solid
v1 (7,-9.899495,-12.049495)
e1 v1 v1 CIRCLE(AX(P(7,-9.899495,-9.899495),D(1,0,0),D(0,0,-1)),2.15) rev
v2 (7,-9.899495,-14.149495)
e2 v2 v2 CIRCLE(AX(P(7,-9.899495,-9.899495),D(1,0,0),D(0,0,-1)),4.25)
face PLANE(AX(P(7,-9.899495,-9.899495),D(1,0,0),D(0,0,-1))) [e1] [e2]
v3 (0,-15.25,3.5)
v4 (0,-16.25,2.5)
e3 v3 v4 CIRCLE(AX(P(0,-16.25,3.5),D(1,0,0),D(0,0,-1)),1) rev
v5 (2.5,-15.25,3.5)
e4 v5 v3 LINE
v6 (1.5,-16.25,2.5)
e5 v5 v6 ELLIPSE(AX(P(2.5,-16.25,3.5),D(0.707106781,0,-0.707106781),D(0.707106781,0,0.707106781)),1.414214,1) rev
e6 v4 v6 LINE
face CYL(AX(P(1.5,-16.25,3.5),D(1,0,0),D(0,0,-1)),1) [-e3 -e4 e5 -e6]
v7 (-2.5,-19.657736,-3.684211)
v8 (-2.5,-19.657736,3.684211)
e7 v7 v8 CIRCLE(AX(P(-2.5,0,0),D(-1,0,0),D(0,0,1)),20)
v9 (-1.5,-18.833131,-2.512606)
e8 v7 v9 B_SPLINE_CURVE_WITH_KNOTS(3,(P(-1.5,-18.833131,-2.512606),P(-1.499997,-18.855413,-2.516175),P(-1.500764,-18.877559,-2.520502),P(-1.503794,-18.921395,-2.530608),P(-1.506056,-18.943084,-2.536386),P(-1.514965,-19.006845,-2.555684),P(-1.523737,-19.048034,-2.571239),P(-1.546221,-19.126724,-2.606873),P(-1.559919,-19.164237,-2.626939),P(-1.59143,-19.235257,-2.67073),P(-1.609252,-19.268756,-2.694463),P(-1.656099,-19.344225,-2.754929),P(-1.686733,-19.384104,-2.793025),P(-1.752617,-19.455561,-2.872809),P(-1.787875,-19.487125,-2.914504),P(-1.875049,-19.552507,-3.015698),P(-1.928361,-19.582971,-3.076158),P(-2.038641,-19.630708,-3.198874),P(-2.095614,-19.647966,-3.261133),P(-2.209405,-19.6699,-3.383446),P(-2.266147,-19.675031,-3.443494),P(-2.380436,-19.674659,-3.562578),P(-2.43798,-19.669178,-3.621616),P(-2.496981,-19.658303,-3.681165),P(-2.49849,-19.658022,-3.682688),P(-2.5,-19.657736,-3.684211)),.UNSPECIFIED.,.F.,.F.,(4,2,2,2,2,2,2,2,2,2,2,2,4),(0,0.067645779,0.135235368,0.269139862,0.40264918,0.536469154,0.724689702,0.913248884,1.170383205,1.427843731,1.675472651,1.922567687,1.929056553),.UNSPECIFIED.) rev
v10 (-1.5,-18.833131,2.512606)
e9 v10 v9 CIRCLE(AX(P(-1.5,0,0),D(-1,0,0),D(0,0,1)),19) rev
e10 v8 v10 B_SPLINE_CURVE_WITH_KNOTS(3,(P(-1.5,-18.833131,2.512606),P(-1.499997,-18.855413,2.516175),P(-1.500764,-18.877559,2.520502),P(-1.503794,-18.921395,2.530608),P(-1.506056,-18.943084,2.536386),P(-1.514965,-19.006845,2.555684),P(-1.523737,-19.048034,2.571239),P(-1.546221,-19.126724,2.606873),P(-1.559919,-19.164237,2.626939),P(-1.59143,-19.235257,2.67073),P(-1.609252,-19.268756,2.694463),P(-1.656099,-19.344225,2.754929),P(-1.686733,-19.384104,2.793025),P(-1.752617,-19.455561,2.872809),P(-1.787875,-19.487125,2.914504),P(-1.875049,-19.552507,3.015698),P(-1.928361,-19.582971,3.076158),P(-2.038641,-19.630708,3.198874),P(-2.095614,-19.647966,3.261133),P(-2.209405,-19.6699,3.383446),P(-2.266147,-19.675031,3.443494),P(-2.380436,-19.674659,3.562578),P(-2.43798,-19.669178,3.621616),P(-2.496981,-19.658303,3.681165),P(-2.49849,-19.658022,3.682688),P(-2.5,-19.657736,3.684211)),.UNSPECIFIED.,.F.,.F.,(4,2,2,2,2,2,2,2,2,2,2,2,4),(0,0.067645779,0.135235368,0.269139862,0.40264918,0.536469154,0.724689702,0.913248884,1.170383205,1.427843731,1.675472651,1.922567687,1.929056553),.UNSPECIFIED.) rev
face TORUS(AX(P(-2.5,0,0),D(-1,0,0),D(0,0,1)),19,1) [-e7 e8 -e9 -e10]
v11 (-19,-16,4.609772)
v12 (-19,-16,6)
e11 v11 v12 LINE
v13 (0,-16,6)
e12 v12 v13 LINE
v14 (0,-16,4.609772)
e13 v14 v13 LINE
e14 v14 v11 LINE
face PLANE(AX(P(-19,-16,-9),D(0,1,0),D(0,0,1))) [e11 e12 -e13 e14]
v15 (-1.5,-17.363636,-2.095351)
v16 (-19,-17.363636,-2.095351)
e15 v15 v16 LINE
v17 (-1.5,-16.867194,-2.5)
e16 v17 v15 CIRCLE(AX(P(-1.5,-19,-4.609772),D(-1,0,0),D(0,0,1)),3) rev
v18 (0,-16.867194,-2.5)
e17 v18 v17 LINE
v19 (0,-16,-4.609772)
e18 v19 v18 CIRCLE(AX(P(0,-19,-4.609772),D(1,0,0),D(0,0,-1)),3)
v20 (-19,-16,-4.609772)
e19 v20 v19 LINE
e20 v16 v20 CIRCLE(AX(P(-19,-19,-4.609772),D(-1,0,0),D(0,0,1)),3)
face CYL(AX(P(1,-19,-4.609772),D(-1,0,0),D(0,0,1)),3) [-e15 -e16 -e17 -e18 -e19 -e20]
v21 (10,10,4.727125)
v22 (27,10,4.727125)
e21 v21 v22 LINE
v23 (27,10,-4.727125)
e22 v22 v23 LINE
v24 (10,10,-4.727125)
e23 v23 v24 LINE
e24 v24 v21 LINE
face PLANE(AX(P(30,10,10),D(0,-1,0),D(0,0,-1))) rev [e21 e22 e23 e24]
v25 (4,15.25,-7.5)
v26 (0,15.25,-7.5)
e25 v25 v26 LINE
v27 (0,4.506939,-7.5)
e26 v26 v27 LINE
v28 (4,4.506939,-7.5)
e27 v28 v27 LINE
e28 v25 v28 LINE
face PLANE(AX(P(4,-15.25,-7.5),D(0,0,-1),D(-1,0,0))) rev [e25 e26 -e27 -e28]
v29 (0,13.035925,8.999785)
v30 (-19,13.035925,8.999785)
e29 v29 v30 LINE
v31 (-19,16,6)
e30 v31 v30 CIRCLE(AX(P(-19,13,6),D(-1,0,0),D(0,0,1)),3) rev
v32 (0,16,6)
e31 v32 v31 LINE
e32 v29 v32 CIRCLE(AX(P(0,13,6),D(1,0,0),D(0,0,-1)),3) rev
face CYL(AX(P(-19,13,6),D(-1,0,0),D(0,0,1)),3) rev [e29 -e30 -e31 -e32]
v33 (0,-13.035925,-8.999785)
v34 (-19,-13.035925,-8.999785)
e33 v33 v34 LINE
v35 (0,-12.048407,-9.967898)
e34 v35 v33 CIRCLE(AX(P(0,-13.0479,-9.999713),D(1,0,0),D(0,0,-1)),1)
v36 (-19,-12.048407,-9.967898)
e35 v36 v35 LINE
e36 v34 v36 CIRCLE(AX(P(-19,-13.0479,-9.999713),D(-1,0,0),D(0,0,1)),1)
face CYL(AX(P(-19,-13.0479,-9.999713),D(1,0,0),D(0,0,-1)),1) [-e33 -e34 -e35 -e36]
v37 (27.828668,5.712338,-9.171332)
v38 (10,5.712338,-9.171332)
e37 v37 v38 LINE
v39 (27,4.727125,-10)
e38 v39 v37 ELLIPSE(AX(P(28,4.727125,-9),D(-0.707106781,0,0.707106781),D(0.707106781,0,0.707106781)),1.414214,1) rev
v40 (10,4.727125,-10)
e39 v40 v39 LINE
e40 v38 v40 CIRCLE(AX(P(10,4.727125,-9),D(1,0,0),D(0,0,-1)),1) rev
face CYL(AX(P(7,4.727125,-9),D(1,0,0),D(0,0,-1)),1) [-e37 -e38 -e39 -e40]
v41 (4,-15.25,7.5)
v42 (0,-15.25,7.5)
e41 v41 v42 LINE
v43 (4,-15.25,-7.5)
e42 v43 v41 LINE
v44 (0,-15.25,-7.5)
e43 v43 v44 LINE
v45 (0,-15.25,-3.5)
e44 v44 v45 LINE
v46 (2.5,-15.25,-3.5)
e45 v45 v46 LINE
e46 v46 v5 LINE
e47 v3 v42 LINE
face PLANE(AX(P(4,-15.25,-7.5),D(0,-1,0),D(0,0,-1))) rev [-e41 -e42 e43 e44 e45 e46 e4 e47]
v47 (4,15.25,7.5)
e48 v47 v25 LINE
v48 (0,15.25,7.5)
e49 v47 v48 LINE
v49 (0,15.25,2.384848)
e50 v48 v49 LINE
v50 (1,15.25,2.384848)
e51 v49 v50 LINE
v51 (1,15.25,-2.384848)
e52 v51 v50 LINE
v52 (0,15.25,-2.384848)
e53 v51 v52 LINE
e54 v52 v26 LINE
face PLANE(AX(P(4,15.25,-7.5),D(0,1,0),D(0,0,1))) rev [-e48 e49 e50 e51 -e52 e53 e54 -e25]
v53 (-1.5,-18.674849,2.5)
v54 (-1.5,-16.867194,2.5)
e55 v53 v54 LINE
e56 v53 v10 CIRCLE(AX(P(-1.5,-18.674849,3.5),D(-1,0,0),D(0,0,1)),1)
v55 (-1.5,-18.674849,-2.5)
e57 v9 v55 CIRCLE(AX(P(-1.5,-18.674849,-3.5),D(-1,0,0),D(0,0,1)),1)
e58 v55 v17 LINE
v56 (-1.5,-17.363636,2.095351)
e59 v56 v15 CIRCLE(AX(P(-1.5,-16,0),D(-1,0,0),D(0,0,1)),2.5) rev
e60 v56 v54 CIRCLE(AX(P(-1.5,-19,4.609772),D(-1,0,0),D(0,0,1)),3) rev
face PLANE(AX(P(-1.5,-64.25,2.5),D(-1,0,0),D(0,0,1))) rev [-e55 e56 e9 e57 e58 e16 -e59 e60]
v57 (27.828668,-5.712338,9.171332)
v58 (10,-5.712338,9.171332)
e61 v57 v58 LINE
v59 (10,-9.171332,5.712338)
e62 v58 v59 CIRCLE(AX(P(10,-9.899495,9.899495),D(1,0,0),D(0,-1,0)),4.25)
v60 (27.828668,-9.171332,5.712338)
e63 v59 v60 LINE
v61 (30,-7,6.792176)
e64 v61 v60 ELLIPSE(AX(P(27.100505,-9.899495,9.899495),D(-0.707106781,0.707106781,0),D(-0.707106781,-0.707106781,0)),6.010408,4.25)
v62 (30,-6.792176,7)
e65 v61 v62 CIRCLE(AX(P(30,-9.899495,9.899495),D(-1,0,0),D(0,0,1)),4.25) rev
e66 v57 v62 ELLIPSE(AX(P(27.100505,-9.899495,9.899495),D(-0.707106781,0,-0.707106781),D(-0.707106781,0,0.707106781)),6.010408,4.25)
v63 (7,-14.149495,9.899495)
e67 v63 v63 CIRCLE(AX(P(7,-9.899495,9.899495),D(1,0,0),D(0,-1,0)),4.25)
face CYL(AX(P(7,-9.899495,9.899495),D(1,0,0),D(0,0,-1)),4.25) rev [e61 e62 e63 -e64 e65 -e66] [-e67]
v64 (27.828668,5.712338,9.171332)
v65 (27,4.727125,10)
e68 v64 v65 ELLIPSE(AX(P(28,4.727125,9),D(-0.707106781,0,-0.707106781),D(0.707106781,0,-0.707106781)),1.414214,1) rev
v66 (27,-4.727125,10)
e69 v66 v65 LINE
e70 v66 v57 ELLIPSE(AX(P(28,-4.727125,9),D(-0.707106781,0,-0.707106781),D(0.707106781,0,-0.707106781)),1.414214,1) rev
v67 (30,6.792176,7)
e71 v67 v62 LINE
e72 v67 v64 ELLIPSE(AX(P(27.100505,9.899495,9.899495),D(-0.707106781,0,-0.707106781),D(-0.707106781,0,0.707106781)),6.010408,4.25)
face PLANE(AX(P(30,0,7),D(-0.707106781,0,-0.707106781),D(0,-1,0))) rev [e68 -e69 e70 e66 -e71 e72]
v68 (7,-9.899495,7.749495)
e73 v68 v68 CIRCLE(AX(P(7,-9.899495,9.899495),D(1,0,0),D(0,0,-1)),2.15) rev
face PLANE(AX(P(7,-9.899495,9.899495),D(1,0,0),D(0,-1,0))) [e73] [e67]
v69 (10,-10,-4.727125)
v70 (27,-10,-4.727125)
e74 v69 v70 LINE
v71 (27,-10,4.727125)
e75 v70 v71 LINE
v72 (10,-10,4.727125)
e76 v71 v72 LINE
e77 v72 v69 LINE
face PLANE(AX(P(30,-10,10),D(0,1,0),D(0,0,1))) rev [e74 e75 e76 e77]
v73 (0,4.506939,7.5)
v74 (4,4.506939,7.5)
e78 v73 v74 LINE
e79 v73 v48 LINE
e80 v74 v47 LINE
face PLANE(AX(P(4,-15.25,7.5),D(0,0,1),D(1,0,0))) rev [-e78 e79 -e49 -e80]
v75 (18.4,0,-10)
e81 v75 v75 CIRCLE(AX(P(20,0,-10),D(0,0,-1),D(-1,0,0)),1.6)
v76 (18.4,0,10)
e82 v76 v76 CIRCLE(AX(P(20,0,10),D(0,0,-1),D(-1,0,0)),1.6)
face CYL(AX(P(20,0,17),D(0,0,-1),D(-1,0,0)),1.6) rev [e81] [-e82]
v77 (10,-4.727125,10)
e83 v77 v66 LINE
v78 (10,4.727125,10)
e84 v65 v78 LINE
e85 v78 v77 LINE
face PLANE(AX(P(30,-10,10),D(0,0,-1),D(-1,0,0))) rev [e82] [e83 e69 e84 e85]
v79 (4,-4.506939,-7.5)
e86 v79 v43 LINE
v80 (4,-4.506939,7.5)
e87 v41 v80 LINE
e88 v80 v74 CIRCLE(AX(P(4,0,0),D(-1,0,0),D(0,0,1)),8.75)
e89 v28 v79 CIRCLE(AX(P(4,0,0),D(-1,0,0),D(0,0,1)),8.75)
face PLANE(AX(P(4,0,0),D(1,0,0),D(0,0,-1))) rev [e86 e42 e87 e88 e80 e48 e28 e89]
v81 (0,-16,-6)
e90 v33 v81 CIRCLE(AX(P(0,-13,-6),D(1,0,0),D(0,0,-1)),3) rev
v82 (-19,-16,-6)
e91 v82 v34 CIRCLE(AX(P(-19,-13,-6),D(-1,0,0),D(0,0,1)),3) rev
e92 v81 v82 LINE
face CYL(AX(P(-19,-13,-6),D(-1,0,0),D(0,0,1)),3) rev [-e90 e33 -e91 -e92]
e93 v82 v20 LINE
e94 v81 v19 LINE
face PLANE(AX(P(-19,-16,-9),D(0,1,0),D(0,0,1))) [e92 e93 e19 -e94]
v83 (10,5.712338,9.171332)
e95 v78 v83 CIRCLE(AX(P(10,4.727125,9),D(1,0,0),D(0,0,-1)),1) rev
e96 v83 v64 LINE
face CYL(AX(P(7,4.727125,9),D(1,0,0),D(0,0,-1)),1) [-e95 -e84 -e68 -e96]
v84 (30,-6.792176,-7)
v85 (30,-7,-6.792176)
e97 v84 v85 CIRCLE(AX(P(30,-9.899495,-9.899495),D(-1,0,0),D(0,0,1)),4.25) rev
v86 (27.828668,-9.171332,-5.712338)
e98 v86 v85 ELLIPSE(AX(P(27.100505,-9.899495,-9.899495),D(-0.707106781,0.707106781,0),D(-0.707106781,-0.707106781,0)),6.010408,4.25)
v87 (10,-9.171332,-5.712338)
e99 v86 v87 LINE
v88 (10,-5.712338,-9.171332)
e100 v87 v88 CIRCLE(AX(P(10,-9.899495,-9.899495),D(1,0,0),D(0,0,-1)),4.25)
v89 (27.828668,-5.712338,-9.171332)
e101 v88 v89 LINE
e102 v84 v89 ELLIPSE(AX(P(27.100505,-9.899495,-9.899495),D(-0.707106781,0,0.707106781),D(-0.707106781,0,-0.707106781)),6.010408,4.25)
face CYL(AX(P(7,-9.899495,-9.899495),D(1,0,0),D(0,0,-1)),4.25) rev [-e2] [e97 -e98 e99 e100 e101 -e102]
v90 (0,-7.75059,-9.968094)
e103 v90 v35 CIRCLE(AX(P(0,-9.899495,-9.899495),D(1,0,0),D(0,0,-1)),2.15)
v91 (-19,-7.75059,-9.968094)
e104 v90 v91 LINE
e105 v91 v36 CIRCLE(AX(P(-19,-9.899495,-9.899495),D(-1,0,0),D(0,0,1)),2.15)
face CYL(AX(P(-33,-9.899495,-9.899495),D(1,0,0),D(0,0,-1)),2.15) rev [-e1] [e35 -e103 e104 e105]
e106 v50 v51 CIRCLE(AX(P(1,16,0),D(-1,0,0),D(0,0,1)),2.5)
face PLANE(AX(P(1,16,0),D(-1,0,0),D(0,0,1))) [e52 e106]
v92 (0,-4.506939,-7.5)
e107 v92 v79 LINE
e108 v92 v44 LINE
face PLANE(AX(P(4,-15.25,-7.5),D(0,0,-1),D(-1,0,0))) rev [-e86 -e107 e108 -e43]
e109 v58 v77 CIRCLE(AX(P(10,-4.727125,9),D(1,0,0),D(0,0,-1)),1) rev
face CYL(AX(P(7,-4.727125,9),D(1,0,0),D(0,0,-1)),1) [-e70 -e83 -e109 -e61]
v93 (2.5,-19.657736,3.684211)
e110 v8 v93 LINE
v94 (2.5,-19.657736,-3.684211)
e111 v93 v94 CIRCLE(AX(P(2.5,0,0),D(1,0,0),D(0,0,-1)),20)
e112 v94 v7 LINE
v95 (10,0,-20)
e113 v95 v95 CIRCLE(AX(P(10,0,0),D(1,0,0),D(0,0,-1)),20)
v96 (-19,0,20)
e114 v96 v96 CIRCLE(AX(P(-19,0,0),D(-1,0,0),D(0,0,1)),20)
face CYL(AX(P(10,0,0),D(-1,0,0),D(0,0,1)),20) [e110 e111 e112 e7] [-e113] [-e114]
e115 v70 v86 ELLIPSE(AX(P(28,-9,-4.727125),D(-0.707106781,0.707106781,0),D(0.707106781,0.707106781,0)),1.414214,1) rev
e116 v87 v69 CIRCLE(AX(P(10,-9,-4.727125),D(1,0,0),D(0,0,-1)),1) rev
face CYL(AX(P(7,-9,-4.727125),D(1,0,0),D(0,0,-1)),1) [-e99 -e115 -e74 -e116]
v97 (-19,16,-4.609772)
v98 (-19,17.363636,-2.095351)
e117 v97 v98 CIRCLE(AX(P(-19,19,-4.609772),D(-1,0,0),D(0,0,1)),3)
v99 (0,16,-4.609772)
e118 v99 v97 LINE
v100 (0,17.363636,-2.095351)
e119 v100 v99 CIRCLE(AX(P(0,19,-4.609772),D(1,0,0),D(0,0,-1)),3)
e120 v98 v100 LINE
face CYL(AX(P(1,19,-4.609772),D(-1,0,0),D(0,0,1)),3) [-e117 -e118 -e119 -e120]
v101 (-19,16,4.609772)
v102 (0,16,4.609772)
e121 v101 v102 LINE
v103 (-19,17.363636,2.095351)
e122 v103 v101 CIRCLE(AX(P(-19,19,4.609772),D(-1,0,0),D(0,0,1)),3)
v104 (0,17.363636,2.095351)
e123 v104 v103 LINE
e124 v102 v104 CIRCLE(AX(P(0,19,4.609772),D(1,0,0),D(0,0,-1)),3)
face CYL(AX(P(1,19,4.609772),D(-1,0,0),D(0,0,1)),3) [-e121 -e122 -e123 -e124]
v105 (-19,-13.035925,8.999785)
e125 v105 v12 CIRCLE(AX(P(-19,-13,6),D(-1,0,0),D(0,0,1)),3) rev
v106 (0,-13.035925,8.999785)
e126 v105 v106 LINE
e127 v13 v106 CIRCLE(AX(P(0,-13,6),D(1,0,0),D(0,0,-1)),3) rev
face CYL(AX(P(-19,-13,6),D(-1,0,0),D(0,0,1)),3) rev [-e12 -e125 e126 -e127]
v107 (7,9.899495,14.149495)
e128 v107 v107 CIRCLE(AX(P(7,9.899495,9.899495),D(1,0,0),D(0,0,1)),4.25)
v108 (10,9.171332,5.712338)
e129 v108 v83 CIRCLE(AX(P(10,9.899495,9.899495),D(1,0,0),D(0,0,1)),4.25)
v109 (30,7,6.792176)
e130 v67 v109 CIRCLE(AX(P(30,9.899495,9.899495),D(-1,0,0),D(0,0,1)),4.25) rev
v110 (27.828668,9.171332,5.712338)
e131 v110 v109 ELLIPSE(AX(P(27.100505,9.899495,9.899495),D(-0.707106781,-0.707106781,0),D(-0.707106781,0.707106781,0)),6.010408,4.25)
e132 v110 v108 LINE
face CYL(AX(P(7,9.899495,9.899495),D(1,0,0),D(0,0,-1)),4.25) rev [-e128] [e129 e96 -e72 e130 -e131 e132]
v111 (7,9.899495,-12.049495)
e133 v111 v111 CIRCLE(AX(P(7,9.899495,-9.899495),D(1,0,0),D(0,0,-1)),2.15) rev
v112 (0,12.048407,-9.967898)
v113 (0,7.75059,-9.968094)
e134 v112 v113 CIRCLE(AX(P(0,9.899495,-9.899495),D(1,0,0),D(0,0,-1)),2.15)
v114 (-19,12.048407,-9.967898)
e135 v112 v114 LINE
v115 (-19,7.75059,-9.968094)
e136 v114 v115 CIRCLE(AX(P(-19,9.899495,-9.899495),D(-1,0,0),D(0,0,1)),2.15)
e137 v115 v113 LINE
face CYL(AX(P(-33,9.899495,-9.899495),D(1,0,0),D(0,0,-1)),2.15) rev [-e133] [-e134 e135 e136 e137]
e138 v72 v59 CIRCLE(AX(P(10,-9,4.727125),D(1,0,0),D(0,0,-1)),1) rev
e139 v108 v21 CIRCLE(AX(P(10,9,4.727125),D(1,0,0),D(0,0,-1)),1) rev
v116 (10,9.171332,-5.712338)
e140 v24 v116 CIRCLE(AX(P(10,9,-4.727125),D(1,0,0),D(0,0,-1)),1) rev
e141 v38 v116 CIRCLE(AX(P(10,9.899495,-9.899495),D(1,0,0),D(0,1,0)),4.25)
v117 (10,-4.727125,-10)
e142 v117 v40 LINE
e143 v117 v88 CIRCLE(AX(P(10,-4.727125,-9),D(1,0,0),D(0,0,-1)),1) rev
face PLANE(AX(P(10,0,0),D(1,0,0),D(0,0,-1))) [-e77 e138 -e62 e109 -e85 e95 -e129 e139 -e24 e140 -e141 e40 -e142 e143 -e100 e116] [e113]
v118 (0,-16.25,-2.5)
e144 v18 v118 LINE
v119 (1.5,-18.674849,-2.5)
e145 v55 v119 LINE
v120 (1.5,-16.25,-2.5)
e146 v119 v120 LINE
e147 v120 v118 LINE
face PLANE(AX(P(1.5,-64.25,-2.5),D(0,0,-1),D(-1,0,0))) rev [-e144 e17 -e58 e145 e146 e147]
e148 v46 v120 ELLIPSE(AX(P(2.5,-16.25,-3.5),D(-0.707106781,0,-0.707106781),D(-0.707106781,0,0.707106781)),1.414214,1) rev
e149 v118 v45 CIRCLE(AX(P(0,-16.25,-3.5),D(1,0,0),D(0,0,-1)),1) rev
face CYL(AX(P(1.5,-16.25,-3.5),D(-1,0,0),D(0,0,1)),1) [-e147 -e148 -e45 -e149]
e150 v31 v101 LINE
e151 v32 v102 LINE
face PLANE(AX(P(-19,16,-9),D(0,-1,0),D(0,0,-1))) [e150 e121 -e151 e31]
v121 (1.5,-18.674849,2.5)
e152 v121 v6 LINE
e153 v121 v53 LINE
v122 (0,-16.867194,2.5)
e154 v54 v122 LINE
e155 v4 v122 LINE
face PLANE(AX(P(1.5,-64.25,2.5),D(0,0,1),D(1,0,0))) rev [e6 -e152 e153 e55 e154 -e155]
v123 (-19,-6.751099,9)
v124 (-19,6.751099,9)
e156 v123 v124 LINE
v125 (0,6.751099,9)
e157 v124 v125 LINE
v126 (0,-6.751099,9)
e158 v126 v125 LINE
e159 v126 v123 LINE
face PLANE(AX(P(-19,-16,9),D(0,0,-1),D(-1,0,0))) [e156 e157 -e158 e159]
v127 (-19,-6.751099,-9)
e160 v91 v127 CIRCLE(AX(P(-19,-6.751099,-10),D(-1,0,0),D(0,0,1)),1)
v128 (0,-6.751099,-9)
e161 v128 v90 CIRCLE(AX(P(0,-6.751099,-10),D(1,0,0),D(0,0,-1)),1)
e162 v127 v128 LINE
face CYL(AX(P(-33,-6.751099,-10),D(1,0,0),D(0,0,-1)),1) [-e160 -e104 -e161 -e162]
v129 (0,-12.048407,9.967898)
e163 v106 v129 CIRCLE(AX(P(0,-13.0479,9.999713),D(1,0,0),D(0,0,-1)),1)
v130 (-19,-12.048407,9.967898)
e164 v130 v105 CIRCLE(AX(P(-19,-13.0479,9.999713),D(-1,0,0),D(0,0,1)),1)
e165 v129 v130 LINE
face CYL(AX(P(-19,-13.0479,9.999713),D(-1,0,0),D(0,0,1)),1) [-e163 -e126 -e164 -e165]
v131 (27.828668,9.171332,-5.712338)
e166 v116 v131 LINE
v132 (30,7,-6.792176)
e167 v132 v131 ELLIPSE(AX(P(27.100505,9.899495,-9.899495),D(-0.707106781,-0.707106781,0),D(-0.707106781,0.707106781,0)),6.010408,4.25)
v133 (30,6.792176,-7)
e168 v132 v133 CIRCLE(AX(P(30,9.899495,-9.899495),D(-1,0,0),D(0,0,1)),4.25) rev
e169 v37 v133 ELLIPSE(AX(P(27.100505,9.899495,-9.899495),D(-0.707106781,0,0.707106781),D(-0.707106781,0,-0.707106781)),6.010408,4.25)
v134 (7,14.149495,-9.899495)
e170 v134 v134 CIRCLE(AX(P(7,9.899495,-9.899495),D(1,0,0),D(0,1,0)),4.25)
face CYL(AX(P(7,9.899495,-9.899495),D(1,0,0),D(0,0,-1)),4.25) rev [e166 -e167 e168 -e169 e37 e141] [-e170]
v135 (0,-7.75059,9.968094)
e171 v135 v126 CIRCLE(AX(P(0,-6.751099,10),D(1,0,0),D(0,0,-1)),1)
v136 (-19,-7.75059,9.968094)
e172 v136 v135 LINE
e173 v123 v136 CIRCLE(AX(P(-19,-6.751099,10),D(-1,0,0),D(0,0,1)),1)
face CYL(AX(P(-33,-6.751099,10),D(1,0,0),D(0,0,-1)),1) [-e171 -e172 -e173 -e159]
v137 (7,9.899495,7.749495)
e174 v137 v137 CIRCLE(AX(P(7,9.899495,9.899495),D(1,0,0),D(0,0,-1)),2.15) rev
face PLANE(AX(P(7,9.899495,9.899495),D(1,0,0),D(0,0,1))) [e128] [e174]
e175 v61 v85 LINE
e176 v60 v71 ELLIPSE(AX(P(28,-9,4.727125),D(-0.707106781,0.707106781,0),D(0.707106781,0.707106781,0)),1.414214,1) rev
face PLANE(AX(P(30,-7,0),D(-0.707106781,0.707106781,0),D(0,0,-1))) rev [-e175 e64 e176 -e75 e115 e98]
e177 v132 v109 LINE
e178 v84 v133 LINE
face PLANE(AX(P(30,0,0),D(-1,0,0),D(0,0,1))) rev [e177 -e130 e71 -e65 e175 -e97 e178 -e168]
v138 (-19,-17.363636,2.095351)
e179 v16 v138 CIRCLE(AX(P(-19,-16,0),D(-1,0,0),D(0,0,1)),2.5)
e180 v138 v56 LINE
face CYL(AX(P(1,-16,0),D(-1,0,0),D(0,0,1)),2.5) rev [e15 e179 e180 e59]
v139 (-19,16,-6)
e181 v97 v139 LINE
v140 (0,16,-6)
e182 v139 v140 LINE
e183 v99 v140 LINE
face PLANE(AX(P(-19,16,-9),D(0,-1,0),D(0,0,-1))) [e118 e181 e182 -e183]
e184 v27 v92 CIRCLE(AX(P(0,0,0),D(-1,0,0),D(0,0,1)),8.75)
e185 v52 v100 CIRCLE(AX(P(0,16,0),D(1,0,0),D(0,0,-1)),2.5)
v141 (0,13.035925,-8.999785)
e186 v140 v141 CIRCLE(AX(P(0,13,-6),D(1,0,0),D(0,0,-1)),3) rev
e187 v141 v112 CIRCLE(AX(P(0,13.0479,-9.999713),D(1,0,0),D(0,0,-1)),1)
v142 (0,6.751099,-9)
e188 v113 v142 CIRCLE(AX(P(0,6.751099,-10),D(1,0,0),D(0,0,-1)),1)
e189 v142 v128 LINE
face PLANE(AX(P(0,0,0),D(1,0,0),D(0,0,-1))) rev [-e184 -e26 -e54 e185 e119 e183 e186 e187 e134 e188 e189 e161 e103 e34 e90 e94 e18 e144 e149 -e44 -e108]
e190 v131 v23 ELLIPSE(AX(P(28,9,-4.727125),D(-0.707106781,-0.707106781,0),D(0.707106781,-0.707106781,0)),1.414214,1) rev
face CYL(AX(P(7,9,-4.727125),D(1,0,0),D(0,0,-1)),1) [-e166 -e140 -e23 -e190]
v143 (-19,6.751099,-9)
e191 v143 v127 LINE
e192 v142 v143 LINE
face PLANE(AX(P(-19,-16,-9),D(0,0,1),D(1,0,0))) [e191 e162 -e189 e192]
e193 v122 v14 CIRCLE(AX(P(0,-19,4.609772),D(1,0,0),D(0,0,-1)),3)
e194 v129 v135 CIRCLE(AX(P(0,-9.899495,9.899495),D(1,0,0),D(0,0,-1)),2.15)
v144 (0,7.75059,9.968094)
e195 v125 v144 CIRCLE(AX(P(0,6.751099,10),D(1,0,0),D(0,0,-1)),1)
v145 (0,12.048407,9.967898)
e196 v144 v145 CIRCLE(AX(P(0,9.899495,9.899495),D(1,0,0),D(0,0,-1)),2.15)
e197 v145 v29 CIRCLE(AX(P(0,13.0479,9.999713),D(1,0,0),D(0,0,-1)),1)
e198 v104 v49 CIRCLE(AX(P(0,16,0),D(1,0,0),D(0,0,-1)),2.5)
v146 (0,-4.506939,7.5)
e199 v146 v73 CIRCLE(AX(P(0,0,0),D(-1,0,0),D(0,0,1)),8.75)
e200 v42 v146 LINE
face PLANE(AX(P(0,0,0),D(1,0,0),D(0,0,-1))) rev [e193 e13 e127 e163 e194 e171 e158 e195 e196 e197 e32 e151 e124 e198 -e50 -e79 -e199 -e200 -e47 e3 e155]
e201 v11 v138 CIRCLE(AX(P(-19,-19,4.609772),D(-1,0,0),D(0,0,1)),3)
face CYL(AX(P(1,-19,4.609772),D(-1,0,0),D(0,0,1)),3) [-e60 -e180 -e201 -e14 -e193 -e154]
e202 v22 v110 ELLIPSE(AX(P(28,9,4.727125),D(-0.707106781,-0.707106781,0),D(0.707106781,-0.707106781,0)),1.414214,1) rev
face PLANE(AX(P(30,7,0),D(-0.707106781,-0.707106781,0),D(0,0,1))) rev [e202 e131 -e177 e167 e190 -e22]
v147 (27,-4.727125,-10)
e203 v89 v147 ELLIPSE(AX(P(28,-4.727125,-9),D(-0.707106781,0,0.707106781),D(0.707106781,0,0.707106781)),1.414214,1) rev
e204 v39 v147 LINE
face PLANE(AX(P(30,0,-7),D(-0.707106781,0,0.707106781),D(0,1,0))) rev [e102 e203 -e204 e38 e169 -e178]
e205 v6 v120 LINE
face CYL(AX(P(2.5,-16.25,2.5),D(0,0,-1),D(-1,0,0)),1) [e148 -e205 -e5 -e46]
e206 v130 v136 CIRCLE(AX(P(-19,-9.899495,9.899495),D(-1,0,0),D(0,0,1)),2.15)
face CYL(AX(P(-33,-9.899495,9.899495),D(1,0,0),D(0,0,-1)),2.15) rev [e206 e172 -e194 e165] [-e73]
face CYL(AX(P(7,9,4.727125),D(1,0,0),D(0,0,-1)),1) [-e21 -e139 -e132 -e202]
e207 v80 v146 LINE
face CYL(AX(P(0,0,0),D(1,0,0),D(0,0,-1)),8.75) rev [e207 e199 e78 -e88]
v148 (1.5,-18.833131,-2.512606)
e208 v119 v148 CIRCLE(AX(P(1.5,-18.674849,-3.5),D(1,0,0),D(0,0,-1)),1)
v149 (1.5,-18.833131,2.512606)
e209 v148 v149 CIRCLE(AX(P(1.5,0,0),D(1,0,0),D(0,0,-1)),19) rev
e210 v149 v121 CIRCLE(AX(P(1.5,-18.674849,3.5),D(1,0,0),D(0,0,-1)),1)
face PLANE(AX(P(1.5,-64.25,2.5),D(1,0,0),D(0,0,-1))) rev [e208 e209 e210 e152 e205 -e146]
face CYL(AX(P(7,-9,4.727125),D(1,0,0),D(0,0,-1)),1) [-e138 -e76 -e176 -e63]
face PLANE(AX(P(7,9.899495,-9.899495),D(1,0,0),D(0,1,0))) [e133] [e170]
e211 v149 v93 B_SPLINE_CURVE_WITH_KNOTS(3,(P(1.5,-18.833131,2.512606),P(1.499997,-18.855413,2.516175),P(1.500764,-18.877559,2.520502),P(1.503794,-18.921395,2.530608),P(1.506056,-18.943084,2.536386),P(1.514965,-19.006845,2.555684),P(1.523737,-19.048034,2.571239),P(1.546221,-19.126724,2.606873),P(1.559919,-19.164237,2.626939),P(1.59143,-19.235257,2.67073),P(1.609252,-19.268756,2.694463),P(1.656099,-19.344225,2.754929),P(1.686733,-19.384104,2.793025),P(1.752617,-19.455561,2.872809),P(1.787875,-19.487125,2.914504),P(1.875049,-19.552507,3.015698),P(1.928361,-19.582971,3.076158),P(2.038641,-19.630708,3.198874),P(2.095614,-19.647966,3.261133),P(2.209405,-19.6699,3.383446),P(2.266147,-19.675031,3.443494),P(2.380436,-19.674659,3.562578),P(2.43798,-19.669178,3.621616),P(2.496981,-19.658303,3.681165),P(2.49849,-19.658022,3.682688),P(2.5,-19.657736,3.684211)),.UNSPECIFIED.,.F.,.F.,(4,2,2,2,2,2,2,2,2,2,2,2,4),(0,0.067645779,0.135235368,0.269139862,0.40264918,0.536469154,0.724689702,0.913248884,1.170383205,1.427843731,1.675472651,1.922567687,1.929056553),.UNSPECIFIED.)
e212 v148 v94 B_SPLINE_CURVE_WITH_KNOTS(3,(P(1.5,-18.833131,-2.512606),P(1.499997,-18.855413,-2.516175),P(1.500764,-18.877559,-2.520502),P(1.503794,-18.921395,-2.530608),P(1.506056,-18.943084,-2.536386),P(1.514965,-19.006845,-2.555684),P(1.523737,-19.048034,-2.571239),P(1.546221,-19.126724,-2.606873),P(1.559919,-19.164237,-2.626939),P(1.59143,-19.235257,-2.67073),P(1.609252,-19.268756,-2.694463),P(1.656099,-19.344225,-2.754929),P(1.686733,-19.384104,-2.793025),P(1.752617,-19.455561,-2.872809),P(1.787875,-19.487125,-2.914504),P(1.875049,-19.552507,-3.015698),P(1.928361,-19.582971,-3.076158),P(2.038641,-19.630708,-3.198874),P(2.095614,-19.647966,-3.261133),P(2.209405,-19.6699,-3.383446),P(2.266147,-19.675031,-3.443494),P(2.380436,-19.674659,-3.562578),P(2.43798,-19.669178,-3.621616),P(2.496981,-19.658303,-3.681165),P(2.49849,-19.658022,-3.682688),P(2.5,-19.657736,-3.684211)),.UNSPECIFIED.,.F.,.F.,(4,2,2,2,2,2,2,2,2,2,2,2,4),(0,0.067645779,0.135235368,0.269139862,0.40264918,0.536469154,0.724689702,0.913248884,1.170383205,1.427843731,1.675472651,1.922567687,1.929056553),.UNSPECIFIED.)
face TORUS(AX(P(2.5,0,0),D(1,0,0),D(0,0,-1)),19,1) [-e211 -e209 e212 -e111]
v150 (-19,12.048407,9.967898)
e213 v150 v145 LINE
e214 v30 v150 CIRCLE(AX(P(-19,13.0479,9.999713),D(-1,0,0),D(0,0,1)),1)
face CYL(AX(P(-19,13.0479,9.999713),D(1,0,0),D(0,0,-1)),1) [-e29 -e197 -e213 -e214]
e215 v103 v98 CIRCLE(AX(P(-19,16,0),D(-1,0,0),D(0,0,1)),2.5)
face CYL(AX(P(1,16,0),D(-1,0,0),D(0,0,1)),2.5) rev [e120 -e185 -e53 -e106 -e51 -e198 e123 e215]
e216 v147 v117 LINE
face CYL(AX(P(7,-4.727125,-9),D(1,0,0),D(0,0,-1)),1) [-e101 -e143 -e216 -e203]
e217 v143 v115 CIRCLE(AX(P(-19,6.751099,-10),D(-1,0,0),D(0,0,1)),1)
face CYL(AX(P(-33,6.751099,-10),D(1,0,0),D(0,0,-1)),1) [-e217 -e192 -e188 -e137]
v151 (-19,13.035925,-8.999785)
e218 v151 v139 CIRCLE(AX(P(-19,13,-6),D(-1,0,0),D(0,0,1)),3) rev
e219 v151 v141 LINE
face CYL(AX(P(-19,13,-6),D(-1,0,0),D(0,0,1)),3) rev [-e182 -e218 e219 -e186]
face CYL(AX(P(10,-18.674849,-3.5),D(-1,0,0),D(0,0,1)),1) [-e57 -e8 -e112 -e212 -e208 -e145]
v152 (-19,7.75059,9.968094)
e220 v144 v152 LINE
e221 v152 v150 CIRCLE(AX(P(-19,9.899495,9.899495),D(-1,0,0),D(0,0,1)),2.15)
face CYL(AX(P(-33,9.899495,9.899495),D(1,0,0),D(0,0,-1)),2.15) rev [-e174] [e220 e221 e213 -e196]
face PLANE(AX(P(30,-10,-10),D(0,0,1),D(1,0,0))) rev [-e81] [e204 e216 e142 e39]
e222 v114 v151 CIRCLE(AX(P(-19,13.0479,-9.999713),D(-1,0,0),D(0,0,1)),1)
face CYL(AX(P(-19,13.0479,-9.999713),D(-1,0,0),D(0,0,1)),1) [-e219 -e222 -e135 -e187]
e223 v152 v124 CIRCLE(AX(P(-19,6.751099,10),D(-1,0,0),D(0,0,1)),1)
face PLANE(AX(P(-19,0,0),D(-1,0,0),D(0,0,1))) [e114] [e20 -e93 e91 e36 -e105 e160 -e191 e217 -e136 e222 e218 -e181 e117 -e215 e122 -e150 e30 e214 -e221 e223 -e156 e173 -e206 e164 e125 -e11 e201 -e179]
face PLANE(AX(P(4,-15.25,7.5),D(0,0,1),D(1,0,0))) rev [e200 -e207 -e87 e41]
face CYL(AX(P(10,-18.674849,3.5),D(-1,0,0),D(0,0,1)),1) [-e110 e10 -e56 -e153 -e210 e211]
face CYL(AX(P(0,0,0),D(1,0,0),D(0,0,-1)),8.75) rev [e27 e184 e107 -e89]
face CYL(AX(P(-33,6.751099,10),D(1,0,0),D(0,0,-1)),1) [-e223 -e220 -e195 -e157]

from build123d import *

# Parameters (mm, degrees)
SKETCH_1_R               = 20
EXTRUDE_1_DEPTH          = 10
SKETCH_2_W               = 15
SKETCH_2_H               = 30.5
CUT_EXTRUDE_1_DEPTH      = 4
SKETCH_3_R               = 8.75
CUT_EXTRUDE_2_DEPTH      = 4
EXTRUDE_START            = 19
SKETCH_4_R               = 20
SKETCH_4_W               = 18
SKETCH_4_H               = 32
EXTRUDE_2_DEPTH          = 19
FILLET_1_R               = 3
SKETCH_5_R               = 2.5
CUT_EXTRUDE_3_DEPTH      = 20
FILLET_2_R               = 3
SKETCH_6_R               = 2.15
CUT_EXTRUDE_4_DEPTH      = 43
FILLET_3_R               = 1
SKETCH_7_R               = 4.25
CUT_EXTRUDE_5_DEPTH      = 3
PATTERN_CIRCULAR_1_COUNT = 4
SKETCH_8_W               = 20
SKETCH_8_H               = 20
EXTRUDE_3_DEPTH          = 20
SKETCH_9_R               = 1.6
CUT_EXTRUDE_6_DEPTH      = 27
CHAMFER_1_SIZE           = 3
CUT_EXTRUDE_START        = 49
SKETCH_11_R              = 4.25
CUT_EXTRUDE_7_DEPTH      = 49
SKETCH_12_W              = 3
SKETCH_12_H              = 5
CUT_EXTRUDE_8_DEPTH      = 49
FILLET_4_R               = 1
FILLET_5_R               = 1
FILLET_6_R               = 1
FILLET_7_R               = 1


with BuildPart() as part:
    # 草图1 → 凸台-拉伸1 (new body)
    with BuildSketch(Plane(origin=(0, 0, 0), x_dir=(0, 0, -1), z_dir=(1, 0, 0))):
        Circle(SKETCH_1_R)
    extrude(amount=EXTRUDE_1_DEPTH)

    # 草图2 → 切除-拉伸1 (cut)
    with BuildSketch(Plane.ZY):
        Rectangle(SKETCH_2_W, SKETCH_2_H)
    extrude(amount=-CUT_EXTRUDE_1_DEPTH, mode=Mode.SUBTRACT)

    # 草图3 → 切除-拉伸2 (cut)
    with BuildSketch(Plane.ZY.offset(-4)):
        Circle(SKETCH_3_R)
    extrude(amount=CUT_EXTRUDE_2_DEPTH, mode=Mode.SUBTRACT)

    # 草图4 → 凸台-拉伸2 (add)
    with BuildSketch(Plane.ZY.offset(EXTRUDE_START)):
        Circle(SKETCH_4_R)
        Rectangle(SKETCH_4_W, SKETCH_4_H, mode=Mode.SUBTRACT)
    extrude(amount=-EXTRUDE_2_DEPTH)

    # 圆角1
    fillet_1_edges = [part.edges().sort_by_distance(p)[0] for p in [
        (-9.5, 16, 9),
        (-9.5, 16, -9),
        (-9.5, -16, -9),
        (-9.5, -16, 9),
    ]]
    fillet(fillet_1_edges, radius=FILLET_1_R)

    # 草图5 → 切除-拉伸3 (cut)
    with BuildSketch(Plane.ZY.offset(19)):
        with Locations((0, -16)):
            Circle(SKETCH_5_R)
        with Locations((0, 16)):
            Circle(SKETCH_5_R)
    extrude(amount=-CUT_EXTRUDE_3_DEPTH, mode=Mode.SUBTRACT)

    # 圆角2
    # the kernel refuses this fillet: 3 mm, written as the material it takes off along each edge
    with BuildSketch(Plane(origin=(-24.274430572, -16, 2.5), x_dir=(0, -0.9586814917396833, -0.2844816292764363), z_dir=(1, 0, 0))) as fillet_2_piece_1:
        with BuildLine():
            CenterArc((2.275853034, -2.876044475), FILLET_2_R, 106.527865575, 56.944268849)
            Line((-0.600191441, -2.022599587), (0, 0))
            ThreePointArc((0, 0), (0.711204073, -0.103296271), (1.422408146, 0))
        make_face()
    extrude(amount=24.274430572, mode=Mode.SUBTRACT)
    with BuildSketch(Plane(origin=(0, -16, -2.5), x_dir=(0, 0, -1), z_dir=(-1, 0, 0))) as fillet_2_piece_2:
        with BuildLine():
            CenterArc((2.109772229, 3), FILLET_2_R, 213.055731151, 56.944268849)
            ThreePointArc((-0.404648987, 1.363636364), (-0.103296271, 0.711204073), (0, 0))
            Line((0, 0), (2.109772229, 0))
        make_face()
    extrude(amount=24.274430572, mode=Mode.SUBTRACT)
    with BuildSketch(Plane(origin=(0, 16, -2.5), x_dir=(0, 0.9586814917396834, 0.2844816292764354), z_dir=(-1, 0, 0))) as fillet_2_piece_3:
        with BuildLine():
            CenterArc((2.275853034, 2.876044475), FILLET_2_R, 196.527865575, 56.944268849)
            Line((-0.600191441, 2.022599587), (0, 0))
            ThreePointArc((0, 0), (0.711204073, 0.103296271), (1.422408146, 0))
        make_face()
    extrude(amount=24.274430572, mode=Mode.SUBTRACT)
    with BuildSketch(Plane(origin=(-24.274430572, 16, 2.5), x_dir=(0, 0, 1), z_dir=(1, 0, 0))) as fillet_2_piece_4:
        with BuildLine():
            CenterArc((2.109772229, -3), FILLET_2_R, 90, 56.944268849)
            ThreePointArc((-0.404648987, -1.363636364), (-0.103296271, -0.711204073), (0, 0))
            Line((0, 0), (2.109772229, 0))
        make_face()
    extrude(amount=24.274430572, mode=Mode.SUBTRACT)

    # 草图6 → 切除-拉伸4 (cut)
    with BuildSketch(Plane(origin=(10, 0, 0), x_dir=(0, 0, -1), z_dir=(1, 0, 0))):
        with Locations((9.899494937, -9.899494937)):
            Circle(SKETCH_6_R)
        with Locations((-9.899494937, -9.899494937)):
            Circle(SKETCH_6_R)
        with Locations((-9.899494937, 9.899494937)):
            Circle(SKETCH_6_R)
        with Locations((9.899494937, 9.899494937)):
            Circle(SKETCH_6_R)
    extrude(amount=-CUT_EXTRUDE_4_DEPTH, mode=Mode.SUBTRACT)

    # 圆角3
    # the kernel refuses this fillet: 1 mm, written as the material it takes off along each edge
    with BuildSketch(Plane(origin=(-21.98900269, -7.946699797, 9), x_dir=(0, 0.1985408891964352, 0.9800926054802622), z_dir=(1, 0, 0)), Plane(origin=(-21.98900269, 7.946699797, -9), x_dir=(0, -0.19854088919647347, -0.9800926054802545), z_dir=(1, 0, 0))) as fillet_3_piece_1:
        with BuildLine():
            CenterArc((1.217468306, -0.973258884), FILLET_3_R, 103.280057781, 88.171589383)
            Line((0.237375701, -1.171799774), (0, 0))
            ThreePointArc((0, 0), (0.493878653, -0.057493399), (0.987757305, 0))
        make_face()
    extrude(amount=21.98900269, mode=Mode.SUBTRACT)
    with BuildSketch(Plane(origin=(-21.959087911, -11.852290077, 9), x_dir=(0, -0.999999983485678, -0.00018173784322620402), z_dir=(1, 0, 0)), Plane(origin=(-21.959087911, 11.852290077, -9), x_dir=(0, 0.9999999834856781, 0.00018173784322619477), z_dir=(1, 0, 0))) as fillet_3_piece_2:
        with BuildLine():
            CenterArc((1.195428513, -0.999930456), FILLET_3_R, 90.675724778, 87.490671362)
            Line((0.195940547, -0.967933494), (0.09599175, -0.964733798))
            ThreePointArc((0.09599175, -0.964733798), (0.056286672, -0.492404834), (-0.090835283, -0.041820466))
            Line((-0.090835283, -0.041820466), (1.8174e-05, 0.099999998))
            ThreePointArc((1.8174e-05, 0.099999998), (1.147728078, 0.099791416), (1.182455829, 0.099993046))
            Line((1.182455829, 0.099993046), (1.183635164, 0))
        make_face()
    extrude(amount=21.959087911, mode=Mode.SUBTRACT)
    with BuildSketch(Plane(origin=(-21.959087911, -11.852290077, -9), x_dir=(0, -0.19858553154825268, -0.98008356105982), z_dir=(1, 0, 0)), Plane(origin=(-21.959087911, 11.852290077, 9), x_dir=(0, 0.19858553154822475, 0.9800835610598256), z_dir=(1, 0, 0))) as fillet_3_piece_3:
        with BuildLine():
            CenterArc((1.217233349, -0.973269347), FILLET_3_R, 103.277447997, 87.490671362)
            Line((0.234841987, -1.160104066), (0.136602851, -1.178787538))
            ThreePointArc((0.136602851, -1.178787538), (0.129910229, -1.144710182), (-0.098008356, -0.019858553))
            Line((-0.098008356, -0.019858553), (0.022966667, 0.097326935))
            ThreePointArc((0.022966667, 0.097326935), (0.49378334, 0.042529095), (0.964600013, 0.097326935))
            Line((0.964600013, 0.097326935), (0.987566679, 0))
        make_face()
    extrude(amount=21.959087911, mode=Mode.SUBTRACT)
    with BuildSketch(Plane(origin=(-21.98900269, -7.946699797, -9), x_dir=(0, 1, 0), z_dir=(1, 0, 0)), Plane(origin=(-21.98900269, 7.946699797, 9), x_dir=(0, -1, 0), z_dir=(1, 0, 0))) as fillet_3_piece_4:
        with BuildLine():
            CenterArc((1.195601076, -1), FILLET_3_R, 90, 88.171589383)
            ThreePointArc((0.196110214, -0.968093631), (0.154403962, -0.472632025), (0, 0))
            Line((0, 0), (1.195601076, 0))
        make_face()
    extrude(amount=21.98900269, mode=Mode.SUBTRACT)

    # 草图7 → 切除-拉伸5 (cut)
    with BuildSketch(Plane(origin=(10, 0, 0), x_dir=(0, 0, -1), z_dir=(1, 0, 0))):
        with Locations((9.899494937, -9.899494937)):
            Circle(SKETCH_7_R)
    cut_extrude_5 = extrude(amount=-CUT_EXTRUDE_5_DEPTH, mode=Mode.SUBTRACT)

    # 阵列(圆周)1: 切除-拉伸5 ×4 about axis
    pattern_circular_1_axis = Axis((0, 0, 0), (1, 0, 0))
    for i in range(1, PATTERN_CIRCULAR_1_COUNT):
        add(cut_extrude_5.rotate(pattern_circular_1_axis, i * 360 / PATTERN_CIRCULAR_1_COUNT), mode=Mode.SUBTRACT)

    # 草图8 → 凸台-拉伸3 (add)
    with BuildSketch(Plane(origin=(10, 0, 0), x_dir=(0, 0, -1), z_dir=(1, 0, 0))):
        Rectangle(SKETCH_8_W, SKETCH_8_H)
    extrude(amount=EXTRUDE_3_DEPTH)

    # 草图9 → 切除-拉伸6 (cut)
    with BuildSketch(Plane(origin=(0, 0, -10), x_dir=(-1, 0, 0), z_dir=(0, 0, -1))):
        with Locations((-20, 0)):
            Circle(SKETCH_9_R)
    extrude(amount=-CUT_EXTRUDE_6_DEPTH, mode=Mode.SUBTRACT)

    # 倒角1
    chamfer_1_edges = [part.edges().sort_by_distance(p)[0] for p in [
        (30, 0, -10),
        (30, 10, 0),
        (30, 0, 10),
        (30, -10, 0),
    ]]
    chamfer(chamfer_1_edges, length=CHAMFER_1_SIZE)

    # 草图11 → 切除-拉伸7 (cut)
    with BuildSketch(Plane(origin=(10, 0, 0), x_dir=(0, 0, -1), z_dir=(1, 0, 0)).offset(CUT_EXTRUDE_START)):
        with Locations(Location((-9.899494937, 9.899494937, 0), (0, 0, 1.355071251))):
            Circle(SKETCH_11_R)
        with Locations(Location((-9.899494937, -9.899494937, 0), (0, 0, 358.644928749))):
            Circle(SKETCH_11_R)
        with Locations((9.899494937, -9.899494937)):
            Circle(SKETCH_11_R)
        with Locations(Location((9.899494937, 9.899494937, 0), (0, 0, 271.355071251))):
            Circle(SKETCH_11_R)
    extrude(amount=-CUT_EXTRUDE_7_DEPTH, mode=Mode.SUBTRACT)

    # 草图12 → 切除-拉伸8 (cut)
    with BuildSketch(Plane(origin=(0, -15.25, 0), x_dir=(1, 0, 0), z_dir=(0, 1, 0))):
        Rectangle(SKETCH_12_W, SKETCH_12_H)
    extrude(amount=-CUT_EXTRUDE_8_DEPTH, mode=Mode.SUBTRACT)

    # 圆角4
    fillet_4_edges = [part.edges().sort_by_distance(p)[0] for p in [
        (0.75, -15.25, -2.5),
        (0.75, -15.25, 2.5),
        (1.5, -15.25, 0),
    ]]
    fillet(fillet_4_edges, radius=FILLET_4_R)

    # 圆角5
    # the kernel refuses this fillet: 1 mm, written as the material it takes off along each edge
    with BuildSketch(Plane(origin=(1.5, 0, 0), x_dir=(0, -0.9688309462653072, -0.24772282405678642), z_dir=(0, 0.24772282405678642, -0.9688309462653072))) as fillet_5_piece_1_section:
        with BuildLine():
            CenterArc((20 - FILLET_5_R, -FILLET_5_R), FILLET_5_R, 0, 90)
            Line((20 - FILLET_5_R, 0), (20, 0))
            Line((20, 0), (20, -FILLET_5_R))
        make_face()
    fillet_5_piece_1 = revolve(axis=Axis((1.5, 0, 0), (-1, 0, 0)), revolution_arc=28.685602918, mode=Mode.PRIVATE)
    fillet_5_piece_1 = split(fillet_5_piece_1, bisect_by=Plane(origin=(1.726387523, -19.720664974, 2.5), z_dir=(0, 0, -1)), keep=Keep.TOP, mode=Mode.PRIVATE)
    fillet_5_piece_1 = split(fillet_5_piece_1, bisect_by=Plane(origin=(1.726387523, -19.720664974, -2.5), z_dir=(0, 0, 1)), keep=Keep.TOP, mode=Mode.PRIVATE)
    add(fillet_5_piece_1, mode=Mode.SUBTRACT)
    with BuildSketch(Plane(origin=(0, -19.843134833, -2.5), x_dir=(0, 0.15467472418788475, -0.9879654496476087), z_dir=(-1, 0, 0))) as fillet_5_piece_2:
        with BuildLine():
            CenterArc((1.168669677, -0.999550922), FILLET_5_R, 88.282823965, 100.61510785)
            Line((0.180704228, -1.154225646), (0, 0))
            ThreePointArc((0, 0), (0.599317783, 0.008981562), (1.198635566, 0))
        make_face()
    extrude(amount=1.5, mode=Mode.SUBTRACT)
    with BuildSketch(Plane(origin=(-1.5, 0, 0), x_dir=(0, -0.968830946265307, -0.24772282405678675), z_dir=(0, 0.24772282405678675, -0.968830946265307))) as fillet_5_piece_3_section:
        with BuildLine():
            CenterArc((20 - FILLET_5_R, FILLET_5_R), FILLET_5_R, 270, 90)
            Line((20 - FILLET_5_R, 0), (20, 0))
            Line((20, 0), (20, FILLET_5_R))
        make_face()
    fillet_5_piece_3 = revolve(axis=Axis((-1.5, 0, 0), (-1, 0, 0)), revolution_arc=28.685602918, mode=Mode.PRIVATE)
    fillet_5_piece_3 = split(fillet_5_piece_3, bisect_by=Plane(origin=(-1.726387523, -19.720664974, 2.5), z_dir=(0, 0, -1)), keep=Keep.TOP, mode=Mode.PRIVATE)
    fillet_5_piece_3 = split(fillet_5_piece_3, bisect_by=Plane(origin=(-1.726387523, -19.720664974, -2.5), z_dir=(0, 0, 1)), keep=Keep.TOP, mode=Mode.PRIVATE)
    add(fillet_5_piece_3, mode=Mode.SUBTRACT)
    with BuildSketch(Plane(origin=(0, -19.843134833, 2.5), x_dir=(0, 1, 0), z_dir=(-1, 0, 0)), Plane(origin=(1.5, -19.843134833, 2.5), x_dir=(0, 1, 0), z_dir=(-1, 0, 0))) as fillet_5_piece_4:
        with BuildLine():
            CenterArc((1.168285436, -1), FILLET_5_R, 90, 100.615107851)
            ThreePointArc((0.185398626, -1.184210526), (0.08382584, -0.593494484), (0, 0))
            Line((0, 0), (1.168285436, 0))
        make_face()
    extrude(amount=1.5, mode=Mode.SUBTRACT)
    with BuildSketch(Plane(origin=(1.5, -19.843134833, -2.5), x_dir=(0, 1, 0), z_dir=(-1, 0, 0))) as fillet_5_piece_5:
        with BuildLine():
            CenterArc((1.168285436, 1), FILLET_5_R, 169.384892149, 100.615107851)
            ThreePointArc((0.185398626, 1.184210526), (0.08382584, 0.593494484), (0, 0))
            Line((0, 0), (1.168285436, 0))
        make_face()
    extrude(amount=1.5, mode=Mode.SUBTRACT)
    with BuildSketch(Plane(origin=(4.496588916, -19.843134833, -2.5), x_dir=(0, 1, 0), z_dir=(-1, 0, 0))) as fillet_5_piece_6a_section:
        with BuildLine():
            CenterArc((1.168285436, 1), FILLET_5_R, 169.384892149, 100.615107851)
            ThreePointArc((0.185398626, 1.184210526), (0.08382584, 0.593494484), (0, 0))
            Line((0, 0), (1.168285436, 0))
        make_face()
    fillet_5_piece_6a = extrude(amount=4.496588916, mode=Mode.PRIVATE)
    fillet_5_piece_6a = split(fillet_5_piece_6a, bisect_by=Plane(origin=(1.5, -19.536518623, -2.774368231), z_dir=(1, 0, 0)), keep=Keep.TOP, mode=Mode.PRIVATE)
    with BuildSketch(Plane(origin=(1.5, 0, 0), x_dir=(0, -0.9688309462653072, -0.24772282405678642), z_dir=(0, 0.24772282405678642, -0.9688309462653072))) as fillet_5_piece_6b_section:
        with BuildLine():
            CenterArc((20 - FILLET_5_R, -FILLET_5_R), FILLET_5_R, 0, 90)
            Line((20 - FILLET_5_R, 0), (20, 0))
            Line((20, 0), (20, -FILLET_5_R))
        make_face()
    fillet_5_piece_6b = revolve(axis=Axis((1.5, 0, 0), (-1, 0, 0)), revolution_arc=28.685602918, mode=Mode.PRIVATE)
    fillet_5_piece_6b = split(fillet_5_piece_6b, bisect_by=Plane(origin=(1.729216038, -19.415537877, -2.5), z_dir=(0, 0, -1)), keep=Keep.TOP, mode=Mode.PRIVATE)
    fillet_5_piece_6 = fillet_5_piece_6a & fillet_5_piece_6b
    add(fillet_5_piece_6, mode=Mode.SUBTRACT)
    with BuildSketch(Plane(origin=(4.496588916, -19.843134833, 2.5), x_dir=(0, 1, 0), z_dir=(-1, 0, 0))) as fillet_5_piece_7a_section:
        with BuildLine():
            CenterArc((1.168285436, -1), FILLET_5_R, 90, 100.615107851)
            ThreePointArc((0.185398626, -1.184210526), (0.08382584, -0.593494484), (0, 0))
            Line((0, 0), (1.168285436, 0))
        make_face()
    fillet_5_piece_7a = extrude(amount=4.496588916, mode=Mode.PRIVATE)
    fillet_5_piece_7a = split(fillet_5_piece_7a, bisect_by=Plane(origin=(1.5, -19.536518623, 2.774368231), z_dir=(1, 0, 0)), keep=Keep.TOP, mode=Mode.PRIVATE)
    with BuildSketch(Plane(origin=(1.5, 0, 0), x_dir=(0, -0.9688309462653072, -0.24772282405678642), z_dir=(0, 0.24772282405678642, -0.9688309462653072))) as fillet_5_piece_7b_section:
        with BuildLine():
            CenterArc((20 - FILLET_5_R, -FILLET_5_R), FILLET_5_R, 0, 90)
            Line((20 - FILLET_5_R, 0), (20, 0))
            Line((20, 0), (20, -FILLET_5_R))
        make_face()
    fillet_5_piece_7b = revolve(axis=Axis((1.5, 0, 0), (-1, 0, 0)), revolution_arc=28.685602918, mode=Mode.PRIVATE)
    fillet_5_piece_7b = split(fillet_5_piece_7b, bisect_by=Plane(origin=(1.729216093, -19.415538131, 2.5), z_dir=(0, 0, 1)), keep=Keep.TOP, mode=Mode.PRIVATE)
    fillet_5_piece_7 = fillet_5_piece_7a & fillet_5_piece_7b
    add(fillet_5_piece_7, mode=Mode.SUBTRACT)
    with BuildSketch(Plane(origin=(-1.5, 0, 0), x_dir=(0, -0.968830946265307, -0.24772282405678675), z_dir=(0, 0.24772282405678675, -0.968830946265307))) as fillet_5_piece_8a_section:
        with BuildLine():
            CenterArc((20 - FILLET_5_R, FILLET_5_R), FILLET_5_R, 270, 90)
            Line((20 - FILLET_5_R, 0), (20, 0))
            Line((20, 0), (20, FILLET_5_R))
        make_face()
    fillet_5_piece_8a = revolve(axis=Axis((-1.5, 0, 0), (-1, 0, 0)), revolution_arc=28.685602918, mode=Mode.PRIVATE)
    fillet_5_piece_8a = split(fillet_5_piece_8a, bisect_by=Plane(origin=(-1.729216046, -19.415537874, -2.5), z_dir=(0, 0, -1)), keep=Keep.TOP, mode=Mode.PRIVATE)
    with BuildSketch(Plane(origin=(0, -19.843134833, -2.5), x_dir=(0, 0.15467472418788475, -0.9879654496476087), z_dir=(-1, 0, 0))) as fillet_5_piece_8b_section:
        with BuildLine():
            CenterArc((1.168669677, -0.999550922), FILLET_5_R, 88.282823965, 100.61510785)
            Line((0.180704228, -1.154225646), (0, 0))
            ThreePointArc((0, 0), (0.599317783, 0.008981562), (1.198635566, 0))
        make_face()
    fillet_5_piece_8b = extrude(amount=4.496588916, mode=Mode.PRIVATE)
    fillet_5_piece_8b = split(fillet_5_piece_8b, bisect_by=Plane(origin=(-1.5, -19.536518623, -2.774368231), z_dir=(-1, 0, 0)), keep=Keep.TOP, mode=Mode.PRIVATE)
    fillet_5_piece_8 = fillet_5_piece_8a & fillet_5_piece_8b
    add(fillet_5_piece_8, mode=Mode.SUBTRACT)
    with BuildSketch(Plane(origin=(0, -19.843134833, 2.5), x_dir=(0, 1, 0), z_dir=(-1, 0, 0))) as fillet_5_piece_9a_section:
        with BuildLine():
            CenterArc((1.168285436, -1), FILLET_5_R, 90, 100.615107851)
            ThreePointArc((0.185398626, -1.184210526), (0.08382584, -0.593494484), (0, 0))
            Line((0, 0), (1.168285436, 0))
        make_face()
    fillet_5_piece_9a = extrude(amount=4.496588916, mode=Mode.PRIVATE)
    fillet_5_piece_9a = split(fillet_5_piece_9a, bisect_by=Plane(origin=(-1.5, -19.536518623, 2.774368231), z_dir=(-1, 0, 0)), keep=Keep.TOP, mode=Mode.PRIVATE)
    with BuildSketch(Plane(origin=(-1.5, 0, 0), x_dir=(0, -0.968830946265307, -0.24772282405678675), z_dir=(0, 0.24772282405678675, -0.968830946265307))) as fillet_5_piece_9b_section:
        with BuildLine():
            CenterArc((20 - FILLET_5_R, FILLET_5_R), FILLET_5_R, 270, 90)
            Line((20 - FILLET_5_R, 0), (20, 0))
            Line((20, 0), (20, FILLET_5_R))
        make_face()
    fillet_5_piece_9b = revolve(axis=Axis((-1.5, 0, 0), (-1, 0, 0)), revolution_arc=28.685602918, mode=Mode.PRIVATE)
    fillet_5_piece_9b = split(fillet_5_piece_9b, bisect_by=Plane(origin=(-1.729216085, -19.415538134, 2.5), z_dir=(0, 0, 1)), keep=Keep.TOP, mode=Mode.PRIVATE)
    fillet_5_piece_9 = fillet_5_piece_9a & fillet_5_piece_9b
    add(fillet_5_piece_9, mode=Mode.SUBTRACT)

    # 圆角6
    # the kernel refuses this fillet: 1 mm, written as the material it takes off along each edge
    with BuildSketch(Plane(origin=(29.308895758, 5.650683487, -10), x_dir=(0, 0.07419746212957036, 0.9972435693518064), z_dir=(-1, 0, 0)), Plane(origin=(10, 10, -5.650683487), x_dir=(0, -0.9972435693518076, -0.07419746212955422), z_dir=(1, 0, 0)), Plane(origin=(10, 5.650683487, 10), x_dir=(0, 0.07419746212941858, -0.9972435693518176), z_dir=(1, 0, 0))) as fillet_6_piece_1:
        with BuildLine():
            CenterArc((0.928717887, -0.995210041), FILLET_6_R, 95.610183041, 80.134705169)
            Line((-0.068525682, -0.921012579), (0, 0))
            ThreePointArc((0, 0), (0.415479055, -0.020357325), (0.83095811, 0))
        make_face()
    extrude(amount=19.308895758, mode=Mode.SUBTRACT)
    with BuildSketch(Plane(origin=(29.308895758, 10, 5.650683487), x_dir=(0, 0, -1), z_dir=(-1, 0, 0))) as fillet_6_piece_2:
        with BuildLine():
            CenterArc((0.923558303, 1), FILLET_6_R, 189.865294831, 80.134705169)
            ThreePointArc((-0.061654983, 0.828667631), (-0.01052628, 0.415844277), (0, 0))
            Line((0, 0), (0.923558303, 0))
        make_face()
    extrude(amount=19.308895758, mode=Mode.SUBTRACT)
    with BuildSketch(Plane(origin=(10, -5.650683487, 10), x_dir=(0, 1, 0), z_dir=(1, 0, 0)), Plane(origin=(10, -10, -5.650683487), x_dir=(0, 0, 1), z_dir=(1, 0, 0))) as fillet_6_piece_3:
        with BuildLine():
            CenterArc((0.923558303, -1), FILLET_6_R, 90, 80.134705169)
            ThreePointArc((-0.061654983, -0.828667631), (-0.01052628, -0.415844277), (0, 0))
            Line((0, 0), (0.923558303, 0))
        make_face()
    extrude(amount=19.308895758, mode=Mode.SUBTRACT)
    with BuildSketch(Plane(origin=(29.308895758, -10, 5.650683487), x_dir=(0, 0.997243569351808, 0.0741974621295495), z_dir=(-1, 0, 0))) as fillet_6_piece_4:
        with BuildLine():
            CenterArc((0.928717887, 0.995210041), FILLET_6_R, 184.25511179, 80.134705169)
            Line((-0.068525682, 0.921012579), (0, 0))
            ThreePointArc((0, 0), (0.415479055, 0.020357325), (0.83095811, 0))
        make_face()
    extrude(amount=19.308895758, mode=Mode.SUBTRACT)

    # 圆角7
    fillet_7_edges = [part.edges().sort_by_distance(p)[0] for p in [
        (18.5, -5.650683487, -10),
    ]]
    fillet(fillet_7_edges, radius=FILLET_7_R)


solid = part.part
